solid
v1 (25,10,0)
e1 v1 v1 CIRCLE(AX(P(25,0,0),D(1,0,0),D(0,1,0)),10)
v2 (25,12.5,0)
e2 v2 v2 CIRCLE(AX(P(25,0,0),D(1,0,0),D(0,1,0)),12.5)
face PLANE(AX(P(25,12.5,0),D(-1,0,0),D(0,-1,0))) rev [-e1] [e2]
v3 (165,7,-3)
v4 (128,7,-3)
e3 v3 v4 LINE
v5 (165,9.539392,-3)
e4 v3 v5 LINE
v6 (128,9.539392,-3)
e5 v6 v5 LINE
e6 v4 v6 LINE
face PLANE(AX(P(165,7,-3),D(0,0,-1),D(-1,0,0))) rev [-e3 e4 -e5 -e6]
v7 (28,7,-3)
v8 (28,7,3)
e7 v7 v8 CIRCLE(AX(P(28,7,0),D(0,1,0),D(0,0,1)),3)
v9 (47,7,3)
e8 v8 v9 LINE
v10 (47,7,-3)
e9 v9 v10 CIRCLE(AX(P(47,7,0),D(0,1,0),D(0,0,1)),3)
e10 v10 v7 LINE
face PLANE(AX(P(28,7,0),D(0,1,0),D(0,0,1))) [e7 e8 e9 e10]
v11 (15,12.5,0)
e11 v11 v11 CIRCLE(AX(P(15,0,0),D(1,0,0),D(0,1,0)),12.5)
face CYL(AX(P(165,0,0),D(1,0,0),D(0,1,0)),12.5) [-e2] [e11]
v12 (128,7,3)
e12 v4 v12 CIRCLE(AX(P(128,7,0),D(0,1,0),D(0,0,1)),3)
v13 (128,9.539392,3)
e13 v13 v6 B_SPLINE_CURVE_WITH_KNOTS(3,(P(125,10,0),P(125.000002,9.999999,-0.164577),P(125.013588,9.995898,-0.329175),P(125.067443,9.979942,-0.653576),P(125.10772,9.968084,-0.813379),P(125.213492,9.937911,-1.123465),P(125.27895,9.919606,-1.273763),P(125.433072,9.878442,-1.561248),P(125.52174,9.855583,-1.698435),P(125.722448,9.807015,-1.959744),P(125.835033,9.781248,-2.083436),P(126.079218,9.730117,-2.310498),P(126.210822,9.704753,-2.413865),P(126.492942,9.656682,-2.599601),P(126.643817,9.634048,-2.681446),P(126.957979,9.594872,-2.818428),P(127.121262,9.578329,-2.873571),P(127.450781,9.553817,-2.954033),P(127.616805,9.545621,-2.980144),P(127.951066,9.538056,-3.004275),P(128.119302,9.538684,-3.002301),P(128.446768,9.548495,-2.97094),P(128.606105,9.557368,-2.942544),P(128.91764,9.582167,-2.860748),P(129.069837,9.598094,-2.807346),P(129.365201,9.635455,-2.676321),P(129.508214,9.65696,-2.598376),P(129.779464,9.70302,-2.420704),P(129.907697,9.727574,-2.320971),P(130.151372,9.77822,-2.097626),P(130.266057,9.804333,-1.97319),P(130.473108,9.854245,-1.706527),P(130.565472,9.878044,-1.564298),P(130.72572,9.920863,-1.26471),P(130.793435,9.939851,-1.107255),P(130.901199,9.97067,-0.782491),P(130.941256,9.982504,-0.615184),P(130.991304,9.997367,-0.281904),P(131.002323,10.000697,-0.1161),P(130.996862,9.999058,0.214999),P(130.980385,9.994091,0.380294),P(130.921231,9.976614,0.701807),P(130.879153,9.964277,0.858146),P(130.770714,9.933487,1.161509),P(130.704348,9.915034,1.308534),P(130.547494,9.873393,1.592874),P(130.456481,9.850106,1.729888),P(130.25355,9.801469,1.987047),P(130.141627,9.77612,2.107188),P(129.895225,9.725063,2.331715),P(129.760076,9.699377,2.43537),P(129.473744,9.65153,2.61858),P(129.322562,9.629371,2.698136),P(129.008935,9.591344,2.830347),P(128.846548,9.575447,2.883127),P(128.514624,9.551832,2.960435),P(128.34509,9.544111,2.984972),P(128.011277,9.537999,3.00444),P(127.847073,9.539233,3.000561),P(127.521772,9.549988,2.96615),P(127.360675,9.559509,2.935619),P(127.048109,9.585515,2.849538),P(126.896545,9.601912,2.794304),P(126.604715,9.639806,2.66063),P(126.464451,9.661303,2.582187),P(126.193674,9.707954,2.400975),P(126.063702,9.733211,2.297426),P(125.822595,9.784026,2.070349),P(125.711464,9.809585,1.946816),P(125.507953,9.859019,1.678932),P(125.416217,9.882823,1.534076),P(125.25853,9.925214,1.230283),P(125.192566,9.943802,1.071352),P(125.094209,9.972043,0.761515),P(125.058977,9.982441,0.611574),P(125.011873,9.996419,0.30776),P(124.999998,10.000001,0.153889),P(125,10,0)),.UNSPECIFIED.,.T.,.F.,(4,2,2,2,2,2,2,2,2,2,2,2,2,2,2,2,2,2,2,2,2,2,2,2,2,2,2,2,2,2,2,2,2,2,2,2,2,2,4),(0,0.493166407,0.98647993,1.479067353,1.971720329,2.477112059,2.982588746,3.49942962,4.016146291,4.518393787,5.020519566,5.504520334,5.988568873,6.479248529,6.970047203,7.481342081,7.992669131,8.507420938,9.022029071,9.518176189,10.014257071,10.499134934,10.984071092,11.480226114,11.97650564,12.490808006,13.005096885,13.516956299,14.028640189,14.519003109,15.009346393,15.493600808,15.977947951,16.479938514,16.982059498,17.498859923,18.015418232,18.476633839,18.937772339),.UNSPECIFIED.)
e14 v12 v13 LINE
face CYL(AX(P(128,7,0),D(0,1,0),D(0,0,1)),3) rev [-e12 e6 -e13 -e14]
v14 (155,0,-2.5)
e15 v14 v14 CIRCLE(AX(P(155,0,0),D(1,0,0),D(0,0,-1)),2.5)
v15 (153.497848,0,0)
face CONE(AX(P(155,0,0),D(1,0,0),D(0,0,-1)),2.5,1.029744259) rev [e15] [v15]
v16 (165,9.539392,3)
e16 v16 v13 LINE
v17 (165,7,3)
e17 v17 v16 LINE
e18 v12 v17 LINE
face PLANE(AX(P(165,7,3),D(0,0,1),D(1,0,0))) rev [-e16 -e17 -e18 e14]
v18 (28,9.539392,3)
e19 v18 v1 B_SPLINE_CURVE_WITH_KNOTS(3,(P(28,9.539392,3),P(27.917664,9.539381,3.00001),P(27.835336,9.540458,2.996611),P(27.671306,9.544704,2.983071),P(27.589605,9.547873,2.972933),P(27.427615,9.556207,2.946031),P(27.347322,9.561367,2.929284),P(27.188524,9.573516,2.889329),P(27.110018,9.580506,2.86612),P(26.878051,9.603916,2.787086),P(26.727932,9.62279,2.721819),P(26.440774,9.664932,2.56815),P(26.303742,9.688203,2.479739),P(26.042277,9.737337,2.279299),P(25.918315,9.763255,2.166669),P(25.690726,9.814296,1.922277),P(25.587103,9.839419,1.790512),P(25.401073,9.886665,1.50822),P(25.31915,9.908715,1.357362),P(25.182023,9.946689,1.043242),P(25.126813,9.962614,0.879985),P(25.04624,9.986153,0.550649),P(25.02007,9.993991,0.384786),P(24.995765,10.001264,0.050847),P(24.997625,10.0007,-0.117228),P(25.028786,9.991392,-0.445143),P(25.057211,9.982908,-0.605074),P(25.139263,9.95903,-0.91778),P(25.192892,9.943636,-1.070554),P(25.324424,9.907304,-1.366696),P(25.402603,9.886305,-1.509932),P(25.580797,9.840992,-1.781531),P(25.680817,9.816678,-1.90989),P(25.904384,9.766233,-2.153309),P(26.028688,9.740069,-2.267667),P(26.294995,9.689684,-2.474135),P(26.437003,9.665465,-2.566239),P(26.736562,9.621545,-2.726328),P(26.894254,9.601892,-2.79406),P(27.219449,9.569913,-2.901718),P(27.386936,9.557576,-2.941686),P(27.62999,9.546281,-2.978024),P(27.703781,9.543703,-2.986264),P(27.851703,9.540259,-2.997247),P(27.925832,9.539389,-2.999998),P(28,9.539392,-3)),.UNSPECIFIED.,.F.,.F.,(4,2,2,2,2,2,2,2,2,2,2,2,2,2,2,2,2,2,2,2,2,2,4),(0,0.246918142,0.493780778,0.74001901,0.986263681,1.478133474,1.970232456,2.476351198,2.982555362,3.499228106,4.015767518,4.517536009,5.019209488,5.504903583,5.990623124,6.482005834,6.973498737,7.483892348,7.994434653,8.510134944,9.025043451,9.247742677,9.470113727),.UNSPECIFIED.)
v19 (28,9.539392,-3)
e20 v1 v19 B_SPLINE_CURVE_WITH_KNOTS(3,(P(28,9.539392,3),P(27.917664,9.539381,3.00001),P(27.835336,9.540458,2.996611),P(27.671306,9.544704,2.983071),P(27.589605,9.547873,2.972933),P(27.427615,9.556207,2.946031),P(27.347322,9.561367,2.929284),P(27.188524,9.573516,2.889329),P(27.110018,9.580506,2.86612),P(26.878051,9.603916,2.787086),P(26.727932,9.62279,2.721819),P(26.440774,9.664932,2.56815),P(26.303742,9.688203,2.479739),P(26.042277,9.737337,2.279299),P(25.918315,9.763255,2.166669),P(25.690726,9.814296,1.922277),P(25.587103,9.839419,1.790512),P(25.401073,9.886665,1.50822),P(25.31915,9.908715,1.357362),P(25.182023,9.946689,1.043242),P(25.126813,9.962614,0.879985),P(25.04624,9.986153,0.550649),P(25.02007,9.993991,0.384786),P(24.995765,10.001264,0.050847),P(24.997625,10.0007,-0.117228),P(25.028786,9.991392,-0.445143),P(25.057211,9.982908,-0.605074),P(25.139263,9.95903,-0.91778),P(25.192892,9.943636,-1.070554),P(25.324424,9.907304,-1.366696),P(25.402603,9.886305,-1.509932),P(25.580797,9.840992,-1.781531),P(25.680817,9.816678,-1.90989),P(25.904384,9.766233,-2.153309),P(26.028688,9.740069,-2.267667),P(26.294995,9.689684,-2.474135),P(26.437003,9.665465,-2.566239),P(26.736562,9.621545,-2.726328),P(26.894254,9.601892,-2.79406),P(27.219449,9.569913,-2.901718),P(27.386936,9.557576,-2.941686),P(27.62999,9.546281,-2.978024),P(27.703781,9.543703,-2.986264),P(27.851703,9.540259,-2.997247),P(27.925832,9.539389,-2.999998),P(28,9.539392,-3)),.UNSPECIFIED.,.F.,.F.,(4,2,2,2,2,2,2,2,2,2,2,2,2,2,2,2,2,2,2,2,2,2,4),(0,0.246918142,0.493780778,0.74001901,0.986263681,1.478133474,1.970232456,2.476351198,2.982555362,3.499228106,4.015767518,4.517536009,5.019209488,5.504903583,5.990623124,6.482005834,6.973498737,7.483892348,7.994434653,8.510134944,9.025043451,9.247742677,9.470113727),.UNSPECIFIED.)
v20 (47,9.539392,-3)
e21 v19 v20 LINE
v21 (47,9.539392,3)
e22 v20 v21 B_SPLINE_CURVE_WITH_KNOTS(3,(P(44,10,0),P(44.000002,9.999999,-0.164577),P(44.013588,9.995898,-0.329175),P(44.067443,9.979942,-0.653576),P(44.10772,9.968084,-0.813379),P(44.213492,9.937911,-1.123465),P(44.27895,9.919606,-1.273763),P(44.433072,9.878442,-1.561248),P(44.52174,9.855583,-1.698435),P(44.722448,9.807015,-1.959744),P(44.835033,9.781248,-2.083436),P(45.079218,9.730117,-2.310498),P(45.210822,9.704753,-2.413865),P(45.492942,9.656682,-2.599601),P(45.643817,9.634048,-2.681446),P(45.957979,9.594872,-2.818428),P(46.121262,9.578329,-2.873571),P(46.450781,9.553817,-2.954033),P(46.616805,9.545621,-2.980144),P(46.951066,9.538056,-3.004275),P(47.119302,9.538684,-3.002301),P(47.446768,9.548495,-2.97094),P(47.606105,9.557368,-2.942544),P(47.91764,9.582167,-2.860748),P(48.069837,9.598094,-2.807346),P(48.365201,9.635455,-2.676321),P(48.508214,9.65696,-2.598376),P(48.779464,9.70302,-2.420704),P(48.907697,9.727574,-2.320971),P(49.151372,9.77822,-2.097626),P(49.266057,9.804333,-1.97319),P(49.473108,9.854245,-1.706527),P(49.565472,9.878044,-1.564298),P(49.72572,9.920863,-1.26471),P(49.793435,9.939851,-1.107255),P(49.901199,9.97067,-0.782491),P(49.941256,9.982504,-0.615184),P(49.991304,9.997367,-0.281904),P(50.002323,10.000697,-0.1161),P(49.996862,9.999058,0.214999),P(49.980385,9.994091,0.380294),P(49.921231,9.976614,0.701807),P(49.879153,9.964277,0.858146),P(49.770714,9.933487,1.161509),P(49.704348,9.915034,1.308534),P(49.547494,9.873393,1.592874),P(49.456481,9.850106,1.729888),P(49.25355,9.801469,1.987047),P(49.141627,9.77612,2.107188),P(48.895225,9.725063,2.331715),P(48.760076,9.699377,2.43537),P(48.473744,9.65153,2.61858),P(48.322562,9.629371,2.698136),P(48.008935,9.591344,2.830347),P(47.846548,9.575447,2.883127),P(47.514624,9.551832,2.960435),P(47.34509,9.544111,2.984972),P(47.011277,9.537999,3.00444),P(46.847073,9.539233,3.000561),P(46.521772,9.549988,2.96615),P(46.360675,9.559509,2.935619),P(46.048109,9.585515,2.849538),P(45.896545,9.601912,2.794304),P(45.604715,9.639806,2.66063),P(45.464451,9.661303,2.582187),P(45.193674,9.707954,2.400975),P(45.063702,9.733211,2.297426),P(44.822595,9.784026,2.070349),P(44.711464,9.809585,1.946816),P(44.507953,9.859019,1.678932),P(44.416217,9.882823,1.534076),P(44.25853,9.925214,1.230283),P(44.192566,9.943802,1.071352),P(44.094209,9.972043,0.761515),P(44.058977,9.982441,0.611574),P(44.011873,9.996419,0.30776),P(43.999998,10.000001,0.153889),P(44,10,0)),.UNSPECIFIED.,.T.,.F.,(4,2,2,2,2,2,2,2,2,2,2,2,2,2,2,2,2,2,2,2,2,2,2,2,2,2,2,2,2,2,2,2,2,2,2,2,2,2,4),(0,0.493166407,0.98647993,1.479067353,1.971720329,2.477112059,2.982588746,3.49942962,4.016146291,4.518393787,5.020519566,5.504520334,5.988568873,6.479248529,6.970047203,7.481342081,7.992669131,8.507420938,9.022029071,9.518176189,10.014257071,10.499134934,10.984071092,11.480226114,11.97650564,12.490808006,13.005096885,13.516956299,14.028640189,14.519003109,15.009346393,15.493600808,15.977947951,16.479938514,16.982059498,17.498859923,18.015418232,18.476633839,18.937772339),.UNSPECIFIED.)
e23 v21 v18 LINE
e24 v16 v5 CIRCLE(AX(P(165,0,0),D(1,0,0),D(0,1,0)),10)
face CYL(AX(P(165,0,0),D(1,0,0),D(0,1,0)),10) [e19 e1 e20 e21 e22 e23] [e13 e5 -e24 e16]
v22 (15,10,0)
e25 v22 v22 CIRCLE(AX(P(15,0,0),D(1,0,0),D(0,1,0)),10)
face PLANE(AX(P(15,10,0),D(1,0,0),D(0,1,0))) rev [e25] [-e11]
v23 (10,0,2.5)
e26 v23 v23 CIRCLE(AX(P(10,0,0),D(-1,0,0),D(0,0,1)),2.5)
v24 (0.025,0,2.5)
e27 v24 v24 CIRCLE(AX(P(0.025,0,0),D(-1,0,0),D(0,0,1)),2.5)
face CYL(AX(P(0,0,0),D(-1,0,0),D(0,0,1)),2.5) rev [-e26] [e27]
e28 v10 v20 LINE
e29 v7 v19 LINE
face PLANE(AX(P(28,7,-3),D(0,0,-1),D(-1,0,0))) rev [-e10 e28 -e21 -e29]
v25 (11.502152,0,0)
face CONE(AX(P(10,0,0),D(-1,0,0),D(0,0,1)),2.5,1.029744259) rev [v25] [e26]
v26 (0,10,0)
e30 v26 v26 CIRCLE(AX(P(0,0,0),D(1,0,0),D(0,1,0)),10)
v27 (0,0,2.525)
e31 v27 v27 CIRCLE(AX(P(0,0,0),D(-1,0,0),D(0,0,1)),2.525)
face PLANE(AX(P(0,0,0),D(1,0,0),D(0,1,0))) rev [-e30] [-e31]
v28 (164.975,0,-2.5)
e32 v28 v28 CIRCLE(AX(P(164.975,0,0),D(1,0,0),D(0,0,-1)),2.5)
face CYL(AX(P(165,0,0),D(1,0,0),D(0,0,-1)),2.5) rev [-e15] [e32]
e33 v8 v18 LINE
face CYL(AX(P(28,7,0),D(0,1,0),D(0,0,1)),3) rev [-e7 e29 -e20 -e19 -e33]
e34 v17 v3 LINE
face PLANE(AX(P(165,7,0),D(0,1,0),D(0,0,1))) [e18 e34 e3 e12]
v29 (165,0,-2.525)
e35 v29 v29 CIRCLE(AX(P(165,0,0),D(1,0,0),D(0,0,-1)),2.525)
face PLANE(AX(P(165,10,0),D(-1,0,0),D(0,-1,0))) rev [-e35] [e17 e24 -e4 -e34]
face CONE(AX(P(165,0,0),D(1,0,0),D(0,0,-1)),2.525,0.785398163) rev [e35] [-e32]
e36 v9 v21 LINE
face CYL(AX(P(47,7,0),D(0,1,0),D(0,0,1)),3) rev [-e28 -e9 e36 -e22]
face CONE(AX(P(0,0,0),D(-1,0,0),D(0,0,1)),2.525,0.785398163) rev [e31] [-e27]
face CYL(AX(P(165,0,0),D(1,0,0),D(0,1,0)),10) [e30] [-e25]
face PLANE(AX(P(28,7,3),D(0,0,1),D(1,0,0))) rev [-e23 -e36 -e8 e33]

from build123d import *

# Parameters (mm, degrees)
REVOLVE_THIN1_OUTLINE_R                   = 10
REVOLVE_THIN1_DEPTH                       = 165
REVOLVE_THIN1_START                       = 15
REVOLVE_THIN1_2_OUTLINE_R                 = 12.5
REVOLVE_THIN1_2_OUTLINE_R_2               = 10
REVOLVE_THIN1_2_DEPTH                     = 10
F_5_0MM_DOWEL_HOLE1_D                     = 5
F_5_0MM_DOWEL_HOLE1_DEPTH                 = 10
F_5_0MM_DOWEL_HOLE1_CSINK_D               = 5.05
F_5_0MM_DOWEL_HOLE1_CSINK_ANGLE           = 90
F_5_0MM_DOWEL_HOLE1_TIP                   = 1.502151548
F_5_0MM_DOWEL_HOLE1_ON_FACE_2_D           = 5
F_5_0MM_DOWEL_HOLE1_ON_FACE_2_DEPTH       = 10
F_5_0MM_DOWEL_HOLE1_ON_FACE_2_CSINK_D     = 5.05
F_5_0MM_DOWEL_HOLE1_ON_FACE_2_CSINK_ANGLE = 90
F_5_0MM_DOWEL_HOLE1_ON_FACE_2_TIP         = 1.502151548
CUT_EXTRUDE1_DEPTH                        = 3


# Read off the part's stored shape, not the designer's step: Revolve-Thin1
with BuildPart() as part:
    # Revolve-Thin1 outline → Revolve-Thin1 (new body)
    with BuildSketch(Plane.YZ):
        Circle(REVOLVE_THIN1_OUTLINE_R)
    extrude(amount=REVOLVE_THIN1_DEPTH)

    # Revolve-Thin1 2 outline → Revolve-Thin1 2 (add)
    with BuildSketch(Plane.YZ.offset(REVOLVE_THIN1_START)):
        Circle(REVOLVE_THIN1_2_OUTLINE_R)
        Circle(REVOLVE_THIN1_2_OUTLINE_R_2, mode=Mode.SUBTRACT)
    extrude(amount=REVOLVE_THIN1_2_DEPTH)

    # Ø5.0mm Dowel Hole1
    with Locations(Plane(origin=(0, 0, 0), x_dir=(0, -1, 0), z_dir=(-1, 0, 0))):
        with Locations((0, 0)):
            CounterSinkHole(F_5_0MM_DOWEL_HOLE1_D / 2, F_5_0MM_DOWEL_HOLE1_CSINK_D / 2, depth=F_5_0MM_DOWEL_HOLE1_DEPTH, counter_sink_angle=F_5_0MM_DOWEL_HOLE1_CSINK_ANGLE)
            with Locations((0, 0, -(F_5_0MM_DOWEL_HOLE1_DEPTH + F_5_0MM_DOWEL_HOLE1_TIP / 2))):  # 118° drill point
                Cone(0, F_5_0MM_DOWEL_HOLE1_D / 2, F_5_0MM_DOWEL_HOLE1_TIP, mode=Mode.SUBTRACT)

    # Ø5.0mm Dowel Hole1 on face 2
    with Locations(Plane(origin=(165, 0, 0), x_dir=(0, 0, 1), z_dir=(1, 0, 0))):
        with Locations((0, 0)):
            CounterSinkHole(F_5_0MM_DOWEL_HOLE1_ON_FACE_2_D / 2, F_5_0MM_DOWEL_HOLE1_ON_FACE_2_CSINK_D / 2, depth=F_5_0MM_DOWEL_HOLE1_ON_FACE_2_DEPTH, counter_sink_angle=F_5_0MM_DOWEL_HOLE1_ON_FACE_2_CSINK_ANGLE)
            with Locations((0, 0, -(F_5_0MM_DOWEL_HOLE1_ON_FACE_2_DEPTH + F_5_0MM_DOWEL_HOLE1_ON_FACE_2_TIP / 2))):  # 118° drill point
                Cone(0, F_5_0MM_DOWEL_HOLE1_ON_FACE_2_D / 2, F_5_0MM_DOWEL_HOLE1_ON_FACE_2_TIP, mode=Mode.SUBTRACT)

    # Sketch3 → Cut-Extrude1 (cut)
    with BuildSketch(Plane(origin=(0, 10, 0), x_dir=(1, 0, 0), z_dir=(0, 1, 0))):
        with BuildLine():
            Line((28, 3), (47, 3))
            ThreePointArc((47, 3), (50, 0), (47, -3))
            Line((47, -3), (28, -3))
            ThreePointArc((28, -3), (25, 0), (28, 3))
        make_face()
        with BuildLine():
            Line((165, -3), (128, -3))
            ThreePointArc((128, -3), (125, 0), (128, 3))
            Line((128, 3), (165, 3))
            ThreePointArc((165, 3), (168, 0), (165, -3))
        make_face()
    extrude(amount=-CUT_EXTRUDE1_DEPTH, mode=Mode.SUBTRACT)


solid = part.part
